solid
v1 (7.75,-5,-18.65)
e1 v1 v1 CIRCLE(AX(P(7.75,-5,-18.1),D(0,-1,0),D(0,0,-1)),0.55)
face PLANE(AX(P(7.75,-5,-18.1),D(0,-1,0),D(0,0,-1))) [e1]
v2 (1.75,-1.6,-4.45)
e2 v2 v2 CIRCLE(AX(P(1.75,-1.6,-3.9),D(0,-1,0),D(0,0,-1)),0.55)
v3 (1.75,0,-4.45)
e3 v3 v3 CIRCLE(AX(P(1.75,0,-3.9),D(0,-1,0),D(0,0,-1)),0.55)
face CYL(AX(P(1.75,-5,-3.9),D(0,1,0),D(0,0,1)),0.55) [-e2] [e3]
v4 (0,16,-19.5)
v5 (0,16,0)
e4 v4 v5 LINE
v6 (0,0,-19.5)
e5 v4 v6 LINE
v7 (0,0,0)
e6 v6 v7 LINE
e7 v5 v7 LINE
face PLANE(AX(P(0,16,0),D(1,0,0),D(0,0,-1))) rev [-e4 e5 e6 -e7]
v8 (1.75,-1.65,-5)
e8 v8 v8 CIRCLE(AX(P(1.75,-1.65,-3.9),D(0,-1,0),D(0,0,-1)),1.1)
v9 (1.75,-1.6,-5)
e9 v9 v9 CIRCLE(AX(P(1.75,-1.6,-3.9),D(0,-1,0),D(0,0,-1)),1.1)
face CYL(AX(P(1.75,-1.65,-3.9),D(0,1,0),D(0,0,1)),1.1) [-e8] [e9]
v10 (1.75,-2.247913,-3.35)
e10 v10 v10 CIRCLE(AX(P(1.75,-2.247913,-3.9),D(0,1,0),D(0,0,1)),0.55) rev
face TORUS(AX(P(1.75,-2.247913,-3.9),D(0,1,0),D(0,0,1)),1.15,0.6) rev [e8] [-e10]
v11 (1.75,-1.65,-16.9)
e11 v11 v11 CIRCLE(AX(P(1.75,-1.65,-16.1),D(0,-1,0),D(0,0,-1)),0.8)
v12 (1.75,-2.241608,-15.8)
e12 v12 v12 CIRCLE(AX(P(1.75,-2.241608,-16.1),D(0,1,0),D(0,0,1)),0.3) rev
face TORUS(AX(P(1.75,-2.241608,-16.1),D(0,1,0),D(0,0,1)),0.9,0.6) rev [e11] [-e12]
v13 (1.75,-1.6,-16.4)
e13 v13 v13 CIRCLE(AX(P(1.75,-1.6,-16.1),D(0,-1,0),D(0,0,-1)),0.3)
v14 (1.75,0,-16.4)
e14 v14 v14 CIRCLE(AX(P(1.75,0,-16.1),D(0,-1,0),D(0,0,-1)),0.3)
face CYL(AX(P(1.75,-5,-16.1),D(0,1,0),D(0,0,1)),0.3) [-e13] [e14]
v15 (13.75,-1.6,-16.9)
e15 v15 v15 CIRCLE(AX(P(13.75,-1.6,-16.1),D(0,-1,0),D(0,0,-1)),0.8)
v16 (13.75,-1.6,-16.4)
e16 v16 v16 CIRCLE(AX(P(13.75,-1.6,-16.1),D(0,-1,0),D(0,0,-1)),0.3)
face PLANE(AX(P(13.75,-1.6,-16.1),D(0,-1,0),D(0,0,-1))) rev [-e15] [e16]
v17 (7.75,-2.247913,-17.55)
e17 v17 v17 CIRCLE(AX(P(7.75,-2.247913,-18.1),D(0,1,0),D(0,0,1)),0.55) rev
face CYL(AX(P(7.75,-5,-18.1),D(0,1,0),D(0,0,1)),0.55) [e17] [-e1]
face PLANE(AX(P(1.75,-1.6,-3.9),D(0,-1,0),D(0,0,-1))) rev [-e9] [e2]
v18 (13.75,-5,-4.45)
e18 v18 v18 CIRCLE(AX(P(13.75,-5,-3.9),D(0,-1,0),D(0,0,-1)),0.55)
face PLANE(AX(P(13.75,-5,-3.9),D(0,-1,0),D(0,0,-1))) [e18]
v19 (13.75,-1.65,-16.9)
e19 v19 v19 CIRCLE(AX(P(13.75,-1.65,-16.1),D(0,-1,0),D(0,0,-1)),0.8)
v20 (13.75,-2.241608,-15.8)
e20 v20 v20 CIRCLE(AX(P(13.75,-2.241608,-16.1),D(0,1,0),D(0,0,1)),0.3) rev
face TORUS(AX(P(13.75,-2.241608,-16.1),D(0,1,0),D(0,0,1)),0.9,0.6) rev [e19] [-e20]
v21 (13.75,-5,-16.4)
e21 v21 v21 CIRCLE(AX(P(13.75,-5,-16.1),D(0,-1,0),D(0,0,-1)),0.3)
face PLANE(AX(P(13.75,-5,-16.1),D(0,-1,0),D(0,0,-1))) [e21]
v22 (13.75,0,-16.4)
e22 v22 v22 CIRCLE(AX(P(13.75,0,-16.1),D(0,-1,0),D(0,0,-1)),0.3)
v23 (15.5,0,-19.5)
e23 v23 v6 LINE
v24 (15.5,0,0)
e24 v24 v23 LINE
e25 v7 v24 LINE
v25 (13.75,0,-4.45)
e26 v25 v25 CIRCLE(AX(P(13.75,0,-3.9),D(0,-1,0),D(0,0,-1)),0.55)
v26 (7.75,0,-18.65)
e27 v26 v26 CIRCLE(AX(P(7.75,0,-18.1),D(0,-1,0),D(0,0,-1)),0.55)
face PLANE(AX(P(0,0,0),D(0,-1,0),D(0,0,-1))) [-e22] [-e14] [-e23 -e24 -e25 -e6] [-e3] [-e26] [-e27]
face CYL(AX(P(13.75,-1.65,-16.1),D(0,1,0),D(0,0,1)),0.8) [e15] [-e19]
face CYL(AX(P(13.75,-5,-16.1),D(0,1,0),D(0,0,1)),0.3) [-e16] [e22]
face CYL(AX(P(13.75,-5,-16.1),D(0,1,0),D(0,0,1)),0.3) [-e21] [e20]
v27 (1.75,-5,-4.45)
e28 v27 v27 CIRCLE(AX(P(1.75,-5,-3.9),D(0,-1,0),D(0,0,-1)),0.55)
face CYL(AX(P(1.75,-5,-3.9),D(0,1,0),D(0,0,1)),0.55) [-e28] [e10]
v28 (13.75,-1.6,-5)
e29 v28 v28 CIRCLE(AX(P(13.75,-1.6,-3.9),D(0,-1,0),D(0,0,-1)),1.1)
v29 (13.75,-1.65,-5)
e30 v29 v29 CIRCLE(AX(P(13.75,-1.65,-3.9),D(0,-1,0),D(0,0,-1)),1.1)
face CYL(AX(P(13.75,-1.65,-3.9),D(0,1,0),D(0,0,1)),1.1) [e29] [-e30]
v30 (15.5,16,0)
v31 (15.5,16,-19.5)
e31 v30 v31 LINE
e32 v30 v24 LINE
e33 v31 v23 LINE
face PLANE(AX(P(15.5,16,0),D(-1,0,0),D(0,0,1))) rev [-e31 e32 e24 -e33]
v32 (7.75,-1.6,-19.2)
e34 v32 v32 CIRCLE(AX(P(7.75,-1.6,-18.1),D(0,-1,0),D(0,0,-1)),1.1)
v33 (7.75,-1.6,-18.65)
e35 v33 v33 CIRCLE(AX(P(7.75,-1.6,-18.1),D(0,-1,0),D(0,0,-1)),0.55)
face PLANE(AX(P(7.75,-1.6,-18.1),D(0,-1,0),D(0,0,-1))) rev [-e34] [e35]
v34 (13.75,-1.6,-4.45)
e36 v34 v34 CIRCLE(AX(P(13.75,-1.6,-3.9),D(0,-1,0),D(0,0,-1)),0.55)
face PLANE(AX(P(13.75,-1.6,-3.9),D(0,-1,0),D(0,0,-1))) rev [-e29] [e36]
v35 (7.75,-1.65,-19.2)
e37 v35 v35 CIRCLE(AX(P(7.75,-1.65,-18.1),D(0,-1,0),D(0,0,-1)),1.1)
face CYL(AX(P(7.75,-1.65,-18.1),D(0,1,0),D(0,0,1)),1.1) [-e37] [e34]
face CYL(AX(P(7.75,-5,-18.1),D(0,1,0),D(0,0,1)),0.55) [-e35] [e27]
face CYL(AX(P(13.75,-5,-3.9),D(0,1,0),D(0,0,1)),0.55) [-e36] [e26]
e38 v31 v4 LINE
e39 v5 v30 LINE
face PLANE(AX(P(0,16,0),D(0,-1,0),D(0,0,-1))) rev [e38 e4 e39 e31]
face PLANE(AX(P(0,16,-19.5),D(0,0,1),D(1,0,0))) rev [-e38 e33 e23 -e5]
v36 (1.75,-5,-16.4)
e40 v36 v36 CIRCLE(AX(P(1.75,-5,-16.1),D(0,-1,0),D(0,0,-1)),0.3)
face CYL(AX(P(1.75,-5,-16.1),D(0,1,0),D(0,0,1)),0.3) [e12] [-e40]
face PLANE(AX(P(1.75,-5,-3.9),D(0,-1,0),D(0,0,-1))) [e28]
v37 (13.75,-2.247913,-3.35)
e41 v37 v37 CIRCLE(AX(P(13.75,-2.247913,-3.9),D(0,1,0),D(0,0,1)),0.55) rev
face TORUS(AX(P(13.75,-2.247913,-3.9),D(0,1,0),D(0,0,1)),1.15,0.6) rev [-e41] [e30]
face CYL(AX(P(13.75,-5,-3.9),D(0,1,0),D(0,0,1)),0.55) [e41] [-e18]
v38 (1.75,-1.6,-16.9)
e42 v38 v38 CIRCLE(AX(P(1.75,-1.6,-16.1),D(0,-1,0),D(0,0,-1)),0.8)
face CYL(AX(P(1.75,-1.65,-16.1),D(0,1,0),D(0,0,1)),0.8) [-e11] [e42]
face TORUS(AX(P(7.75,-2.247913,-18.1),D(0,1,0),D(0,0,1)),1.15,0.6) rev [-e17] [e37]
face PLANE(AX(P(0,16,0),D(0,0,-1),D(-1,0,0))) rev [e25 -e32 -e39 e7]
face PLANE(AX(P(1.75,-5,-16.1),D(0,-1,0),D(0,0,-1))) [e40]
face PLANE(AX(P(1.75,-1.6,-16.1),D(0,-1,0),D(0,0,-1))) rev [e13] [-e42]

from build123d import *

# Parameters (mm, degrees)
ESQUISSE1_W        = 15.5
ESQUISSE1_H        = 19.5
BOSS_EXTRU_1_DEPTH = 16
ESQUISSE2_R        = 0.55
ESQUISSE2_R_2      = 0.3
BOSS_EXTRU_2_DEPTH = 5
BOSS_EXTRU_3_START = 1.6
ESQUISSE4_R        = 1.1
ESQUISSE4_R_2      = 0.8
BOSS_EXTRU_3_DEPTH = 0.05
CONG_1_R           = 0.6


with BuildPart() as part:
    # Esquisse1 → Boss.-Extru.1 (new body)
    with BuildSketch(Plane(origin=(0, 0, 0), x_dir=(1, 0, 0), z_dir=(0, 1, 0))):
        with Locations((7.75, 9.75)):
            Rectangle(ESQUISSE1_W, ESQUISSE1_H)
    extrude(amount=BOSS_EXTRU_1_DEPTH)

    # Esquisse2 → Boss.-Extru.2 (add)
    with BuildSketch(Plane.XZ):
        with Locations(Location((1.75, -3.9, 0), (0, 0, 270))):
            Circle(ESQUISSE2_R)
        with Locations(Location((13.75, -3.9, 0), (0, 0, 270))):
            Circle(ESQUISSE2_R)
        with Locations(Location((7.75, -18.1, 0), (0, 0, 270))):
            Circle(ESQUISSE2_R)
        with Locations(Location((1.75, -16.1, 0), (0, 0, 270))):
            Circle(ESQUISSE2_R_2)
        with Locations(Location((13.75, -16.1, 0), (0, 0, 270))):
            Circle(ESQUISSE2_R_2)
    extrude(amount=BOSS_EXTRU_2_DEPTH)

    # Esquisse4 → Boss.-Extru.3 (add)
    with BuildSketch(Plane.XZ.offset(BOSS_EXTRU_3_START)):
        with Locations(Location((1.75, -3.9, 0), (0, 0, 270))):
            Circle(ESQUISSE4_R)
        with Locations(Location((13.75, -3.9, 0), (0, 0, 270))):
            Circle(ESQUISSE4_R)
        with Locations(Location((7.75, -18.1, 0), (0, 0, 270))):
            Circle(ESQUISSE4_R)
        with Locations(Location((1.75, -16.1, 0), (0, 0, 270))):
            Circle(ESQUISSE4_R_2)
        with Locations(Location((13.75, -16.1, 0), (0, 0, 270))):
            Circle(ESQUISSE4_R_2)
    extrude(amount=BOSS_EXTRU_3_DEPTH)

    # Congé1
    # the kernel refuses this fillet: 0.6 mm, written as the material it adds along each edge
    with BuildSketch(Plane(origin=(1.75, -1.65, -3.9), x_dir=(0, 0, -1), z_dir=(1, 0, 0))) as cong_1_piece_1:
        with BuildLine():
            CenterArc((1.15, -0.597913037), CONG_1_R, 94.780191847, 85.219808153)
            Line((0.55, -0.597913037), (0.538, -0.597913037))
            Line((0.538, -0.597913037), (0.538, 0))
            Line((0.538, 0), (0.55, 0.012))
            ThreePointArc((0.55, 0.012), (0.825, 0.012), (1.099, 0.011958261))
            Line((1.099, 0.011958261), (1.1, 0))
        make_face()
    revolve(axis=Axis((1.75, -1.65, -3.9), (0, 1, 0)))
    with BuildSketch(Plane(origin=(13.75, -1.65, -3.9), x_dir=(0, 0, -1), z_dir=(1, 0, 0))) as cong_1_piece_2:
        with BuildLine():
            CenterArc((1.15, -0.597913037), CONG_1_R, 94.780191847, 85.219808153)
            Line((0.55, -0.597913037), (0.538, -0.597913037))
            Line((0.538, -0.597913037), (0.538, 0))
            Line((0.538, 0), (0.55, 0.012))
            ThreePointArc((0.55, 0.012), (0.825, 0.012), (1.099, 0.011958261))
            Line((1.099, 0.011958261), (1.1, 0))
        make_face()
    revolve(axis=Axis((13.75, -1.65, -3.9), (0, 1, 0)))
    with BuildSketch(Plane(origin=(7.75, -1.65, -18.1), x_dir=(0, 0, -1), z_dir=(1, 0, 0))) as cong_1_piece_3:
        with BuildLine():
            CenterArc((1.15, -0.597913037), CONG_1_R, 94.780191847, 85.219808153)
            Line((0.55, -0.597913037), (0.538, -0.597913037))
            Line((0.538, -0.597913037), (0.538, 0))
            Line((0.538, 0), (0.55, 0.012))
            ThreePointArc((0.55, 0.012), (0.825, 0.012), (1.099, 0.011958261))
            Line((1.099, 0.011958261), (1.1, 0))
        make_face()
    revolve(axis=Axis((7.75, -1.65, -18.1), (0, 1, 0)))
    with BuildSketch(Plane(origin=(1.75, -1.65, -16.1), x_dir=(0, 0, -1), z_dir=(1, 0, 0))) as cong_1_piece_4:
        with BuildLine():
            CenterArc((0.9, -0.591607978), CONG_1_R, 99.594068227, 80.405931773)
            Line((0.3, -0.591607978), (0.288, -0.591607978))
            Line((0.288, -0.591607978), (0.288, 0))
            Line((0.288, 0), (0.3, 0.012))
            ThreePointArc((0.3, 0.012), (0.55, 0.012), (0.798, 0.01183216))
            Line((0.798, 0.01183216), (0.8, 0))
        make_face()
    revolve(axis=Axis((1.75, -1.65, -16.1), (0, 1, 0)))
    with BuildSketch(Plane(origin=(13.75, -1.65, -16.1), x_dir=(0, 0, -1), z_dir=(1, 0, 0))) as cong_1_piece_5:
        with BuildLine():
            CenterArc((0.9, -0.591607978), CONG_1_R, 99.594068227, 80.405931773)
            Line((0.3, -0.591607978), (0.288, -0.591607978))
            Line((0.288, -0.591607978), (0.288, 0))
            Line((0.288, 0), (0.3, 0.012))
            ThreePointArc((0.3, 0.012), (0.55, 0.012), (0.798, 0.01183216))
            Line((0.798, 0.01183216), (0.8, 0))
        make_face()
    revolve(axis=Axis((13.75, -1.65, -16.1), (0, 1, 0)))


solid = part.part
